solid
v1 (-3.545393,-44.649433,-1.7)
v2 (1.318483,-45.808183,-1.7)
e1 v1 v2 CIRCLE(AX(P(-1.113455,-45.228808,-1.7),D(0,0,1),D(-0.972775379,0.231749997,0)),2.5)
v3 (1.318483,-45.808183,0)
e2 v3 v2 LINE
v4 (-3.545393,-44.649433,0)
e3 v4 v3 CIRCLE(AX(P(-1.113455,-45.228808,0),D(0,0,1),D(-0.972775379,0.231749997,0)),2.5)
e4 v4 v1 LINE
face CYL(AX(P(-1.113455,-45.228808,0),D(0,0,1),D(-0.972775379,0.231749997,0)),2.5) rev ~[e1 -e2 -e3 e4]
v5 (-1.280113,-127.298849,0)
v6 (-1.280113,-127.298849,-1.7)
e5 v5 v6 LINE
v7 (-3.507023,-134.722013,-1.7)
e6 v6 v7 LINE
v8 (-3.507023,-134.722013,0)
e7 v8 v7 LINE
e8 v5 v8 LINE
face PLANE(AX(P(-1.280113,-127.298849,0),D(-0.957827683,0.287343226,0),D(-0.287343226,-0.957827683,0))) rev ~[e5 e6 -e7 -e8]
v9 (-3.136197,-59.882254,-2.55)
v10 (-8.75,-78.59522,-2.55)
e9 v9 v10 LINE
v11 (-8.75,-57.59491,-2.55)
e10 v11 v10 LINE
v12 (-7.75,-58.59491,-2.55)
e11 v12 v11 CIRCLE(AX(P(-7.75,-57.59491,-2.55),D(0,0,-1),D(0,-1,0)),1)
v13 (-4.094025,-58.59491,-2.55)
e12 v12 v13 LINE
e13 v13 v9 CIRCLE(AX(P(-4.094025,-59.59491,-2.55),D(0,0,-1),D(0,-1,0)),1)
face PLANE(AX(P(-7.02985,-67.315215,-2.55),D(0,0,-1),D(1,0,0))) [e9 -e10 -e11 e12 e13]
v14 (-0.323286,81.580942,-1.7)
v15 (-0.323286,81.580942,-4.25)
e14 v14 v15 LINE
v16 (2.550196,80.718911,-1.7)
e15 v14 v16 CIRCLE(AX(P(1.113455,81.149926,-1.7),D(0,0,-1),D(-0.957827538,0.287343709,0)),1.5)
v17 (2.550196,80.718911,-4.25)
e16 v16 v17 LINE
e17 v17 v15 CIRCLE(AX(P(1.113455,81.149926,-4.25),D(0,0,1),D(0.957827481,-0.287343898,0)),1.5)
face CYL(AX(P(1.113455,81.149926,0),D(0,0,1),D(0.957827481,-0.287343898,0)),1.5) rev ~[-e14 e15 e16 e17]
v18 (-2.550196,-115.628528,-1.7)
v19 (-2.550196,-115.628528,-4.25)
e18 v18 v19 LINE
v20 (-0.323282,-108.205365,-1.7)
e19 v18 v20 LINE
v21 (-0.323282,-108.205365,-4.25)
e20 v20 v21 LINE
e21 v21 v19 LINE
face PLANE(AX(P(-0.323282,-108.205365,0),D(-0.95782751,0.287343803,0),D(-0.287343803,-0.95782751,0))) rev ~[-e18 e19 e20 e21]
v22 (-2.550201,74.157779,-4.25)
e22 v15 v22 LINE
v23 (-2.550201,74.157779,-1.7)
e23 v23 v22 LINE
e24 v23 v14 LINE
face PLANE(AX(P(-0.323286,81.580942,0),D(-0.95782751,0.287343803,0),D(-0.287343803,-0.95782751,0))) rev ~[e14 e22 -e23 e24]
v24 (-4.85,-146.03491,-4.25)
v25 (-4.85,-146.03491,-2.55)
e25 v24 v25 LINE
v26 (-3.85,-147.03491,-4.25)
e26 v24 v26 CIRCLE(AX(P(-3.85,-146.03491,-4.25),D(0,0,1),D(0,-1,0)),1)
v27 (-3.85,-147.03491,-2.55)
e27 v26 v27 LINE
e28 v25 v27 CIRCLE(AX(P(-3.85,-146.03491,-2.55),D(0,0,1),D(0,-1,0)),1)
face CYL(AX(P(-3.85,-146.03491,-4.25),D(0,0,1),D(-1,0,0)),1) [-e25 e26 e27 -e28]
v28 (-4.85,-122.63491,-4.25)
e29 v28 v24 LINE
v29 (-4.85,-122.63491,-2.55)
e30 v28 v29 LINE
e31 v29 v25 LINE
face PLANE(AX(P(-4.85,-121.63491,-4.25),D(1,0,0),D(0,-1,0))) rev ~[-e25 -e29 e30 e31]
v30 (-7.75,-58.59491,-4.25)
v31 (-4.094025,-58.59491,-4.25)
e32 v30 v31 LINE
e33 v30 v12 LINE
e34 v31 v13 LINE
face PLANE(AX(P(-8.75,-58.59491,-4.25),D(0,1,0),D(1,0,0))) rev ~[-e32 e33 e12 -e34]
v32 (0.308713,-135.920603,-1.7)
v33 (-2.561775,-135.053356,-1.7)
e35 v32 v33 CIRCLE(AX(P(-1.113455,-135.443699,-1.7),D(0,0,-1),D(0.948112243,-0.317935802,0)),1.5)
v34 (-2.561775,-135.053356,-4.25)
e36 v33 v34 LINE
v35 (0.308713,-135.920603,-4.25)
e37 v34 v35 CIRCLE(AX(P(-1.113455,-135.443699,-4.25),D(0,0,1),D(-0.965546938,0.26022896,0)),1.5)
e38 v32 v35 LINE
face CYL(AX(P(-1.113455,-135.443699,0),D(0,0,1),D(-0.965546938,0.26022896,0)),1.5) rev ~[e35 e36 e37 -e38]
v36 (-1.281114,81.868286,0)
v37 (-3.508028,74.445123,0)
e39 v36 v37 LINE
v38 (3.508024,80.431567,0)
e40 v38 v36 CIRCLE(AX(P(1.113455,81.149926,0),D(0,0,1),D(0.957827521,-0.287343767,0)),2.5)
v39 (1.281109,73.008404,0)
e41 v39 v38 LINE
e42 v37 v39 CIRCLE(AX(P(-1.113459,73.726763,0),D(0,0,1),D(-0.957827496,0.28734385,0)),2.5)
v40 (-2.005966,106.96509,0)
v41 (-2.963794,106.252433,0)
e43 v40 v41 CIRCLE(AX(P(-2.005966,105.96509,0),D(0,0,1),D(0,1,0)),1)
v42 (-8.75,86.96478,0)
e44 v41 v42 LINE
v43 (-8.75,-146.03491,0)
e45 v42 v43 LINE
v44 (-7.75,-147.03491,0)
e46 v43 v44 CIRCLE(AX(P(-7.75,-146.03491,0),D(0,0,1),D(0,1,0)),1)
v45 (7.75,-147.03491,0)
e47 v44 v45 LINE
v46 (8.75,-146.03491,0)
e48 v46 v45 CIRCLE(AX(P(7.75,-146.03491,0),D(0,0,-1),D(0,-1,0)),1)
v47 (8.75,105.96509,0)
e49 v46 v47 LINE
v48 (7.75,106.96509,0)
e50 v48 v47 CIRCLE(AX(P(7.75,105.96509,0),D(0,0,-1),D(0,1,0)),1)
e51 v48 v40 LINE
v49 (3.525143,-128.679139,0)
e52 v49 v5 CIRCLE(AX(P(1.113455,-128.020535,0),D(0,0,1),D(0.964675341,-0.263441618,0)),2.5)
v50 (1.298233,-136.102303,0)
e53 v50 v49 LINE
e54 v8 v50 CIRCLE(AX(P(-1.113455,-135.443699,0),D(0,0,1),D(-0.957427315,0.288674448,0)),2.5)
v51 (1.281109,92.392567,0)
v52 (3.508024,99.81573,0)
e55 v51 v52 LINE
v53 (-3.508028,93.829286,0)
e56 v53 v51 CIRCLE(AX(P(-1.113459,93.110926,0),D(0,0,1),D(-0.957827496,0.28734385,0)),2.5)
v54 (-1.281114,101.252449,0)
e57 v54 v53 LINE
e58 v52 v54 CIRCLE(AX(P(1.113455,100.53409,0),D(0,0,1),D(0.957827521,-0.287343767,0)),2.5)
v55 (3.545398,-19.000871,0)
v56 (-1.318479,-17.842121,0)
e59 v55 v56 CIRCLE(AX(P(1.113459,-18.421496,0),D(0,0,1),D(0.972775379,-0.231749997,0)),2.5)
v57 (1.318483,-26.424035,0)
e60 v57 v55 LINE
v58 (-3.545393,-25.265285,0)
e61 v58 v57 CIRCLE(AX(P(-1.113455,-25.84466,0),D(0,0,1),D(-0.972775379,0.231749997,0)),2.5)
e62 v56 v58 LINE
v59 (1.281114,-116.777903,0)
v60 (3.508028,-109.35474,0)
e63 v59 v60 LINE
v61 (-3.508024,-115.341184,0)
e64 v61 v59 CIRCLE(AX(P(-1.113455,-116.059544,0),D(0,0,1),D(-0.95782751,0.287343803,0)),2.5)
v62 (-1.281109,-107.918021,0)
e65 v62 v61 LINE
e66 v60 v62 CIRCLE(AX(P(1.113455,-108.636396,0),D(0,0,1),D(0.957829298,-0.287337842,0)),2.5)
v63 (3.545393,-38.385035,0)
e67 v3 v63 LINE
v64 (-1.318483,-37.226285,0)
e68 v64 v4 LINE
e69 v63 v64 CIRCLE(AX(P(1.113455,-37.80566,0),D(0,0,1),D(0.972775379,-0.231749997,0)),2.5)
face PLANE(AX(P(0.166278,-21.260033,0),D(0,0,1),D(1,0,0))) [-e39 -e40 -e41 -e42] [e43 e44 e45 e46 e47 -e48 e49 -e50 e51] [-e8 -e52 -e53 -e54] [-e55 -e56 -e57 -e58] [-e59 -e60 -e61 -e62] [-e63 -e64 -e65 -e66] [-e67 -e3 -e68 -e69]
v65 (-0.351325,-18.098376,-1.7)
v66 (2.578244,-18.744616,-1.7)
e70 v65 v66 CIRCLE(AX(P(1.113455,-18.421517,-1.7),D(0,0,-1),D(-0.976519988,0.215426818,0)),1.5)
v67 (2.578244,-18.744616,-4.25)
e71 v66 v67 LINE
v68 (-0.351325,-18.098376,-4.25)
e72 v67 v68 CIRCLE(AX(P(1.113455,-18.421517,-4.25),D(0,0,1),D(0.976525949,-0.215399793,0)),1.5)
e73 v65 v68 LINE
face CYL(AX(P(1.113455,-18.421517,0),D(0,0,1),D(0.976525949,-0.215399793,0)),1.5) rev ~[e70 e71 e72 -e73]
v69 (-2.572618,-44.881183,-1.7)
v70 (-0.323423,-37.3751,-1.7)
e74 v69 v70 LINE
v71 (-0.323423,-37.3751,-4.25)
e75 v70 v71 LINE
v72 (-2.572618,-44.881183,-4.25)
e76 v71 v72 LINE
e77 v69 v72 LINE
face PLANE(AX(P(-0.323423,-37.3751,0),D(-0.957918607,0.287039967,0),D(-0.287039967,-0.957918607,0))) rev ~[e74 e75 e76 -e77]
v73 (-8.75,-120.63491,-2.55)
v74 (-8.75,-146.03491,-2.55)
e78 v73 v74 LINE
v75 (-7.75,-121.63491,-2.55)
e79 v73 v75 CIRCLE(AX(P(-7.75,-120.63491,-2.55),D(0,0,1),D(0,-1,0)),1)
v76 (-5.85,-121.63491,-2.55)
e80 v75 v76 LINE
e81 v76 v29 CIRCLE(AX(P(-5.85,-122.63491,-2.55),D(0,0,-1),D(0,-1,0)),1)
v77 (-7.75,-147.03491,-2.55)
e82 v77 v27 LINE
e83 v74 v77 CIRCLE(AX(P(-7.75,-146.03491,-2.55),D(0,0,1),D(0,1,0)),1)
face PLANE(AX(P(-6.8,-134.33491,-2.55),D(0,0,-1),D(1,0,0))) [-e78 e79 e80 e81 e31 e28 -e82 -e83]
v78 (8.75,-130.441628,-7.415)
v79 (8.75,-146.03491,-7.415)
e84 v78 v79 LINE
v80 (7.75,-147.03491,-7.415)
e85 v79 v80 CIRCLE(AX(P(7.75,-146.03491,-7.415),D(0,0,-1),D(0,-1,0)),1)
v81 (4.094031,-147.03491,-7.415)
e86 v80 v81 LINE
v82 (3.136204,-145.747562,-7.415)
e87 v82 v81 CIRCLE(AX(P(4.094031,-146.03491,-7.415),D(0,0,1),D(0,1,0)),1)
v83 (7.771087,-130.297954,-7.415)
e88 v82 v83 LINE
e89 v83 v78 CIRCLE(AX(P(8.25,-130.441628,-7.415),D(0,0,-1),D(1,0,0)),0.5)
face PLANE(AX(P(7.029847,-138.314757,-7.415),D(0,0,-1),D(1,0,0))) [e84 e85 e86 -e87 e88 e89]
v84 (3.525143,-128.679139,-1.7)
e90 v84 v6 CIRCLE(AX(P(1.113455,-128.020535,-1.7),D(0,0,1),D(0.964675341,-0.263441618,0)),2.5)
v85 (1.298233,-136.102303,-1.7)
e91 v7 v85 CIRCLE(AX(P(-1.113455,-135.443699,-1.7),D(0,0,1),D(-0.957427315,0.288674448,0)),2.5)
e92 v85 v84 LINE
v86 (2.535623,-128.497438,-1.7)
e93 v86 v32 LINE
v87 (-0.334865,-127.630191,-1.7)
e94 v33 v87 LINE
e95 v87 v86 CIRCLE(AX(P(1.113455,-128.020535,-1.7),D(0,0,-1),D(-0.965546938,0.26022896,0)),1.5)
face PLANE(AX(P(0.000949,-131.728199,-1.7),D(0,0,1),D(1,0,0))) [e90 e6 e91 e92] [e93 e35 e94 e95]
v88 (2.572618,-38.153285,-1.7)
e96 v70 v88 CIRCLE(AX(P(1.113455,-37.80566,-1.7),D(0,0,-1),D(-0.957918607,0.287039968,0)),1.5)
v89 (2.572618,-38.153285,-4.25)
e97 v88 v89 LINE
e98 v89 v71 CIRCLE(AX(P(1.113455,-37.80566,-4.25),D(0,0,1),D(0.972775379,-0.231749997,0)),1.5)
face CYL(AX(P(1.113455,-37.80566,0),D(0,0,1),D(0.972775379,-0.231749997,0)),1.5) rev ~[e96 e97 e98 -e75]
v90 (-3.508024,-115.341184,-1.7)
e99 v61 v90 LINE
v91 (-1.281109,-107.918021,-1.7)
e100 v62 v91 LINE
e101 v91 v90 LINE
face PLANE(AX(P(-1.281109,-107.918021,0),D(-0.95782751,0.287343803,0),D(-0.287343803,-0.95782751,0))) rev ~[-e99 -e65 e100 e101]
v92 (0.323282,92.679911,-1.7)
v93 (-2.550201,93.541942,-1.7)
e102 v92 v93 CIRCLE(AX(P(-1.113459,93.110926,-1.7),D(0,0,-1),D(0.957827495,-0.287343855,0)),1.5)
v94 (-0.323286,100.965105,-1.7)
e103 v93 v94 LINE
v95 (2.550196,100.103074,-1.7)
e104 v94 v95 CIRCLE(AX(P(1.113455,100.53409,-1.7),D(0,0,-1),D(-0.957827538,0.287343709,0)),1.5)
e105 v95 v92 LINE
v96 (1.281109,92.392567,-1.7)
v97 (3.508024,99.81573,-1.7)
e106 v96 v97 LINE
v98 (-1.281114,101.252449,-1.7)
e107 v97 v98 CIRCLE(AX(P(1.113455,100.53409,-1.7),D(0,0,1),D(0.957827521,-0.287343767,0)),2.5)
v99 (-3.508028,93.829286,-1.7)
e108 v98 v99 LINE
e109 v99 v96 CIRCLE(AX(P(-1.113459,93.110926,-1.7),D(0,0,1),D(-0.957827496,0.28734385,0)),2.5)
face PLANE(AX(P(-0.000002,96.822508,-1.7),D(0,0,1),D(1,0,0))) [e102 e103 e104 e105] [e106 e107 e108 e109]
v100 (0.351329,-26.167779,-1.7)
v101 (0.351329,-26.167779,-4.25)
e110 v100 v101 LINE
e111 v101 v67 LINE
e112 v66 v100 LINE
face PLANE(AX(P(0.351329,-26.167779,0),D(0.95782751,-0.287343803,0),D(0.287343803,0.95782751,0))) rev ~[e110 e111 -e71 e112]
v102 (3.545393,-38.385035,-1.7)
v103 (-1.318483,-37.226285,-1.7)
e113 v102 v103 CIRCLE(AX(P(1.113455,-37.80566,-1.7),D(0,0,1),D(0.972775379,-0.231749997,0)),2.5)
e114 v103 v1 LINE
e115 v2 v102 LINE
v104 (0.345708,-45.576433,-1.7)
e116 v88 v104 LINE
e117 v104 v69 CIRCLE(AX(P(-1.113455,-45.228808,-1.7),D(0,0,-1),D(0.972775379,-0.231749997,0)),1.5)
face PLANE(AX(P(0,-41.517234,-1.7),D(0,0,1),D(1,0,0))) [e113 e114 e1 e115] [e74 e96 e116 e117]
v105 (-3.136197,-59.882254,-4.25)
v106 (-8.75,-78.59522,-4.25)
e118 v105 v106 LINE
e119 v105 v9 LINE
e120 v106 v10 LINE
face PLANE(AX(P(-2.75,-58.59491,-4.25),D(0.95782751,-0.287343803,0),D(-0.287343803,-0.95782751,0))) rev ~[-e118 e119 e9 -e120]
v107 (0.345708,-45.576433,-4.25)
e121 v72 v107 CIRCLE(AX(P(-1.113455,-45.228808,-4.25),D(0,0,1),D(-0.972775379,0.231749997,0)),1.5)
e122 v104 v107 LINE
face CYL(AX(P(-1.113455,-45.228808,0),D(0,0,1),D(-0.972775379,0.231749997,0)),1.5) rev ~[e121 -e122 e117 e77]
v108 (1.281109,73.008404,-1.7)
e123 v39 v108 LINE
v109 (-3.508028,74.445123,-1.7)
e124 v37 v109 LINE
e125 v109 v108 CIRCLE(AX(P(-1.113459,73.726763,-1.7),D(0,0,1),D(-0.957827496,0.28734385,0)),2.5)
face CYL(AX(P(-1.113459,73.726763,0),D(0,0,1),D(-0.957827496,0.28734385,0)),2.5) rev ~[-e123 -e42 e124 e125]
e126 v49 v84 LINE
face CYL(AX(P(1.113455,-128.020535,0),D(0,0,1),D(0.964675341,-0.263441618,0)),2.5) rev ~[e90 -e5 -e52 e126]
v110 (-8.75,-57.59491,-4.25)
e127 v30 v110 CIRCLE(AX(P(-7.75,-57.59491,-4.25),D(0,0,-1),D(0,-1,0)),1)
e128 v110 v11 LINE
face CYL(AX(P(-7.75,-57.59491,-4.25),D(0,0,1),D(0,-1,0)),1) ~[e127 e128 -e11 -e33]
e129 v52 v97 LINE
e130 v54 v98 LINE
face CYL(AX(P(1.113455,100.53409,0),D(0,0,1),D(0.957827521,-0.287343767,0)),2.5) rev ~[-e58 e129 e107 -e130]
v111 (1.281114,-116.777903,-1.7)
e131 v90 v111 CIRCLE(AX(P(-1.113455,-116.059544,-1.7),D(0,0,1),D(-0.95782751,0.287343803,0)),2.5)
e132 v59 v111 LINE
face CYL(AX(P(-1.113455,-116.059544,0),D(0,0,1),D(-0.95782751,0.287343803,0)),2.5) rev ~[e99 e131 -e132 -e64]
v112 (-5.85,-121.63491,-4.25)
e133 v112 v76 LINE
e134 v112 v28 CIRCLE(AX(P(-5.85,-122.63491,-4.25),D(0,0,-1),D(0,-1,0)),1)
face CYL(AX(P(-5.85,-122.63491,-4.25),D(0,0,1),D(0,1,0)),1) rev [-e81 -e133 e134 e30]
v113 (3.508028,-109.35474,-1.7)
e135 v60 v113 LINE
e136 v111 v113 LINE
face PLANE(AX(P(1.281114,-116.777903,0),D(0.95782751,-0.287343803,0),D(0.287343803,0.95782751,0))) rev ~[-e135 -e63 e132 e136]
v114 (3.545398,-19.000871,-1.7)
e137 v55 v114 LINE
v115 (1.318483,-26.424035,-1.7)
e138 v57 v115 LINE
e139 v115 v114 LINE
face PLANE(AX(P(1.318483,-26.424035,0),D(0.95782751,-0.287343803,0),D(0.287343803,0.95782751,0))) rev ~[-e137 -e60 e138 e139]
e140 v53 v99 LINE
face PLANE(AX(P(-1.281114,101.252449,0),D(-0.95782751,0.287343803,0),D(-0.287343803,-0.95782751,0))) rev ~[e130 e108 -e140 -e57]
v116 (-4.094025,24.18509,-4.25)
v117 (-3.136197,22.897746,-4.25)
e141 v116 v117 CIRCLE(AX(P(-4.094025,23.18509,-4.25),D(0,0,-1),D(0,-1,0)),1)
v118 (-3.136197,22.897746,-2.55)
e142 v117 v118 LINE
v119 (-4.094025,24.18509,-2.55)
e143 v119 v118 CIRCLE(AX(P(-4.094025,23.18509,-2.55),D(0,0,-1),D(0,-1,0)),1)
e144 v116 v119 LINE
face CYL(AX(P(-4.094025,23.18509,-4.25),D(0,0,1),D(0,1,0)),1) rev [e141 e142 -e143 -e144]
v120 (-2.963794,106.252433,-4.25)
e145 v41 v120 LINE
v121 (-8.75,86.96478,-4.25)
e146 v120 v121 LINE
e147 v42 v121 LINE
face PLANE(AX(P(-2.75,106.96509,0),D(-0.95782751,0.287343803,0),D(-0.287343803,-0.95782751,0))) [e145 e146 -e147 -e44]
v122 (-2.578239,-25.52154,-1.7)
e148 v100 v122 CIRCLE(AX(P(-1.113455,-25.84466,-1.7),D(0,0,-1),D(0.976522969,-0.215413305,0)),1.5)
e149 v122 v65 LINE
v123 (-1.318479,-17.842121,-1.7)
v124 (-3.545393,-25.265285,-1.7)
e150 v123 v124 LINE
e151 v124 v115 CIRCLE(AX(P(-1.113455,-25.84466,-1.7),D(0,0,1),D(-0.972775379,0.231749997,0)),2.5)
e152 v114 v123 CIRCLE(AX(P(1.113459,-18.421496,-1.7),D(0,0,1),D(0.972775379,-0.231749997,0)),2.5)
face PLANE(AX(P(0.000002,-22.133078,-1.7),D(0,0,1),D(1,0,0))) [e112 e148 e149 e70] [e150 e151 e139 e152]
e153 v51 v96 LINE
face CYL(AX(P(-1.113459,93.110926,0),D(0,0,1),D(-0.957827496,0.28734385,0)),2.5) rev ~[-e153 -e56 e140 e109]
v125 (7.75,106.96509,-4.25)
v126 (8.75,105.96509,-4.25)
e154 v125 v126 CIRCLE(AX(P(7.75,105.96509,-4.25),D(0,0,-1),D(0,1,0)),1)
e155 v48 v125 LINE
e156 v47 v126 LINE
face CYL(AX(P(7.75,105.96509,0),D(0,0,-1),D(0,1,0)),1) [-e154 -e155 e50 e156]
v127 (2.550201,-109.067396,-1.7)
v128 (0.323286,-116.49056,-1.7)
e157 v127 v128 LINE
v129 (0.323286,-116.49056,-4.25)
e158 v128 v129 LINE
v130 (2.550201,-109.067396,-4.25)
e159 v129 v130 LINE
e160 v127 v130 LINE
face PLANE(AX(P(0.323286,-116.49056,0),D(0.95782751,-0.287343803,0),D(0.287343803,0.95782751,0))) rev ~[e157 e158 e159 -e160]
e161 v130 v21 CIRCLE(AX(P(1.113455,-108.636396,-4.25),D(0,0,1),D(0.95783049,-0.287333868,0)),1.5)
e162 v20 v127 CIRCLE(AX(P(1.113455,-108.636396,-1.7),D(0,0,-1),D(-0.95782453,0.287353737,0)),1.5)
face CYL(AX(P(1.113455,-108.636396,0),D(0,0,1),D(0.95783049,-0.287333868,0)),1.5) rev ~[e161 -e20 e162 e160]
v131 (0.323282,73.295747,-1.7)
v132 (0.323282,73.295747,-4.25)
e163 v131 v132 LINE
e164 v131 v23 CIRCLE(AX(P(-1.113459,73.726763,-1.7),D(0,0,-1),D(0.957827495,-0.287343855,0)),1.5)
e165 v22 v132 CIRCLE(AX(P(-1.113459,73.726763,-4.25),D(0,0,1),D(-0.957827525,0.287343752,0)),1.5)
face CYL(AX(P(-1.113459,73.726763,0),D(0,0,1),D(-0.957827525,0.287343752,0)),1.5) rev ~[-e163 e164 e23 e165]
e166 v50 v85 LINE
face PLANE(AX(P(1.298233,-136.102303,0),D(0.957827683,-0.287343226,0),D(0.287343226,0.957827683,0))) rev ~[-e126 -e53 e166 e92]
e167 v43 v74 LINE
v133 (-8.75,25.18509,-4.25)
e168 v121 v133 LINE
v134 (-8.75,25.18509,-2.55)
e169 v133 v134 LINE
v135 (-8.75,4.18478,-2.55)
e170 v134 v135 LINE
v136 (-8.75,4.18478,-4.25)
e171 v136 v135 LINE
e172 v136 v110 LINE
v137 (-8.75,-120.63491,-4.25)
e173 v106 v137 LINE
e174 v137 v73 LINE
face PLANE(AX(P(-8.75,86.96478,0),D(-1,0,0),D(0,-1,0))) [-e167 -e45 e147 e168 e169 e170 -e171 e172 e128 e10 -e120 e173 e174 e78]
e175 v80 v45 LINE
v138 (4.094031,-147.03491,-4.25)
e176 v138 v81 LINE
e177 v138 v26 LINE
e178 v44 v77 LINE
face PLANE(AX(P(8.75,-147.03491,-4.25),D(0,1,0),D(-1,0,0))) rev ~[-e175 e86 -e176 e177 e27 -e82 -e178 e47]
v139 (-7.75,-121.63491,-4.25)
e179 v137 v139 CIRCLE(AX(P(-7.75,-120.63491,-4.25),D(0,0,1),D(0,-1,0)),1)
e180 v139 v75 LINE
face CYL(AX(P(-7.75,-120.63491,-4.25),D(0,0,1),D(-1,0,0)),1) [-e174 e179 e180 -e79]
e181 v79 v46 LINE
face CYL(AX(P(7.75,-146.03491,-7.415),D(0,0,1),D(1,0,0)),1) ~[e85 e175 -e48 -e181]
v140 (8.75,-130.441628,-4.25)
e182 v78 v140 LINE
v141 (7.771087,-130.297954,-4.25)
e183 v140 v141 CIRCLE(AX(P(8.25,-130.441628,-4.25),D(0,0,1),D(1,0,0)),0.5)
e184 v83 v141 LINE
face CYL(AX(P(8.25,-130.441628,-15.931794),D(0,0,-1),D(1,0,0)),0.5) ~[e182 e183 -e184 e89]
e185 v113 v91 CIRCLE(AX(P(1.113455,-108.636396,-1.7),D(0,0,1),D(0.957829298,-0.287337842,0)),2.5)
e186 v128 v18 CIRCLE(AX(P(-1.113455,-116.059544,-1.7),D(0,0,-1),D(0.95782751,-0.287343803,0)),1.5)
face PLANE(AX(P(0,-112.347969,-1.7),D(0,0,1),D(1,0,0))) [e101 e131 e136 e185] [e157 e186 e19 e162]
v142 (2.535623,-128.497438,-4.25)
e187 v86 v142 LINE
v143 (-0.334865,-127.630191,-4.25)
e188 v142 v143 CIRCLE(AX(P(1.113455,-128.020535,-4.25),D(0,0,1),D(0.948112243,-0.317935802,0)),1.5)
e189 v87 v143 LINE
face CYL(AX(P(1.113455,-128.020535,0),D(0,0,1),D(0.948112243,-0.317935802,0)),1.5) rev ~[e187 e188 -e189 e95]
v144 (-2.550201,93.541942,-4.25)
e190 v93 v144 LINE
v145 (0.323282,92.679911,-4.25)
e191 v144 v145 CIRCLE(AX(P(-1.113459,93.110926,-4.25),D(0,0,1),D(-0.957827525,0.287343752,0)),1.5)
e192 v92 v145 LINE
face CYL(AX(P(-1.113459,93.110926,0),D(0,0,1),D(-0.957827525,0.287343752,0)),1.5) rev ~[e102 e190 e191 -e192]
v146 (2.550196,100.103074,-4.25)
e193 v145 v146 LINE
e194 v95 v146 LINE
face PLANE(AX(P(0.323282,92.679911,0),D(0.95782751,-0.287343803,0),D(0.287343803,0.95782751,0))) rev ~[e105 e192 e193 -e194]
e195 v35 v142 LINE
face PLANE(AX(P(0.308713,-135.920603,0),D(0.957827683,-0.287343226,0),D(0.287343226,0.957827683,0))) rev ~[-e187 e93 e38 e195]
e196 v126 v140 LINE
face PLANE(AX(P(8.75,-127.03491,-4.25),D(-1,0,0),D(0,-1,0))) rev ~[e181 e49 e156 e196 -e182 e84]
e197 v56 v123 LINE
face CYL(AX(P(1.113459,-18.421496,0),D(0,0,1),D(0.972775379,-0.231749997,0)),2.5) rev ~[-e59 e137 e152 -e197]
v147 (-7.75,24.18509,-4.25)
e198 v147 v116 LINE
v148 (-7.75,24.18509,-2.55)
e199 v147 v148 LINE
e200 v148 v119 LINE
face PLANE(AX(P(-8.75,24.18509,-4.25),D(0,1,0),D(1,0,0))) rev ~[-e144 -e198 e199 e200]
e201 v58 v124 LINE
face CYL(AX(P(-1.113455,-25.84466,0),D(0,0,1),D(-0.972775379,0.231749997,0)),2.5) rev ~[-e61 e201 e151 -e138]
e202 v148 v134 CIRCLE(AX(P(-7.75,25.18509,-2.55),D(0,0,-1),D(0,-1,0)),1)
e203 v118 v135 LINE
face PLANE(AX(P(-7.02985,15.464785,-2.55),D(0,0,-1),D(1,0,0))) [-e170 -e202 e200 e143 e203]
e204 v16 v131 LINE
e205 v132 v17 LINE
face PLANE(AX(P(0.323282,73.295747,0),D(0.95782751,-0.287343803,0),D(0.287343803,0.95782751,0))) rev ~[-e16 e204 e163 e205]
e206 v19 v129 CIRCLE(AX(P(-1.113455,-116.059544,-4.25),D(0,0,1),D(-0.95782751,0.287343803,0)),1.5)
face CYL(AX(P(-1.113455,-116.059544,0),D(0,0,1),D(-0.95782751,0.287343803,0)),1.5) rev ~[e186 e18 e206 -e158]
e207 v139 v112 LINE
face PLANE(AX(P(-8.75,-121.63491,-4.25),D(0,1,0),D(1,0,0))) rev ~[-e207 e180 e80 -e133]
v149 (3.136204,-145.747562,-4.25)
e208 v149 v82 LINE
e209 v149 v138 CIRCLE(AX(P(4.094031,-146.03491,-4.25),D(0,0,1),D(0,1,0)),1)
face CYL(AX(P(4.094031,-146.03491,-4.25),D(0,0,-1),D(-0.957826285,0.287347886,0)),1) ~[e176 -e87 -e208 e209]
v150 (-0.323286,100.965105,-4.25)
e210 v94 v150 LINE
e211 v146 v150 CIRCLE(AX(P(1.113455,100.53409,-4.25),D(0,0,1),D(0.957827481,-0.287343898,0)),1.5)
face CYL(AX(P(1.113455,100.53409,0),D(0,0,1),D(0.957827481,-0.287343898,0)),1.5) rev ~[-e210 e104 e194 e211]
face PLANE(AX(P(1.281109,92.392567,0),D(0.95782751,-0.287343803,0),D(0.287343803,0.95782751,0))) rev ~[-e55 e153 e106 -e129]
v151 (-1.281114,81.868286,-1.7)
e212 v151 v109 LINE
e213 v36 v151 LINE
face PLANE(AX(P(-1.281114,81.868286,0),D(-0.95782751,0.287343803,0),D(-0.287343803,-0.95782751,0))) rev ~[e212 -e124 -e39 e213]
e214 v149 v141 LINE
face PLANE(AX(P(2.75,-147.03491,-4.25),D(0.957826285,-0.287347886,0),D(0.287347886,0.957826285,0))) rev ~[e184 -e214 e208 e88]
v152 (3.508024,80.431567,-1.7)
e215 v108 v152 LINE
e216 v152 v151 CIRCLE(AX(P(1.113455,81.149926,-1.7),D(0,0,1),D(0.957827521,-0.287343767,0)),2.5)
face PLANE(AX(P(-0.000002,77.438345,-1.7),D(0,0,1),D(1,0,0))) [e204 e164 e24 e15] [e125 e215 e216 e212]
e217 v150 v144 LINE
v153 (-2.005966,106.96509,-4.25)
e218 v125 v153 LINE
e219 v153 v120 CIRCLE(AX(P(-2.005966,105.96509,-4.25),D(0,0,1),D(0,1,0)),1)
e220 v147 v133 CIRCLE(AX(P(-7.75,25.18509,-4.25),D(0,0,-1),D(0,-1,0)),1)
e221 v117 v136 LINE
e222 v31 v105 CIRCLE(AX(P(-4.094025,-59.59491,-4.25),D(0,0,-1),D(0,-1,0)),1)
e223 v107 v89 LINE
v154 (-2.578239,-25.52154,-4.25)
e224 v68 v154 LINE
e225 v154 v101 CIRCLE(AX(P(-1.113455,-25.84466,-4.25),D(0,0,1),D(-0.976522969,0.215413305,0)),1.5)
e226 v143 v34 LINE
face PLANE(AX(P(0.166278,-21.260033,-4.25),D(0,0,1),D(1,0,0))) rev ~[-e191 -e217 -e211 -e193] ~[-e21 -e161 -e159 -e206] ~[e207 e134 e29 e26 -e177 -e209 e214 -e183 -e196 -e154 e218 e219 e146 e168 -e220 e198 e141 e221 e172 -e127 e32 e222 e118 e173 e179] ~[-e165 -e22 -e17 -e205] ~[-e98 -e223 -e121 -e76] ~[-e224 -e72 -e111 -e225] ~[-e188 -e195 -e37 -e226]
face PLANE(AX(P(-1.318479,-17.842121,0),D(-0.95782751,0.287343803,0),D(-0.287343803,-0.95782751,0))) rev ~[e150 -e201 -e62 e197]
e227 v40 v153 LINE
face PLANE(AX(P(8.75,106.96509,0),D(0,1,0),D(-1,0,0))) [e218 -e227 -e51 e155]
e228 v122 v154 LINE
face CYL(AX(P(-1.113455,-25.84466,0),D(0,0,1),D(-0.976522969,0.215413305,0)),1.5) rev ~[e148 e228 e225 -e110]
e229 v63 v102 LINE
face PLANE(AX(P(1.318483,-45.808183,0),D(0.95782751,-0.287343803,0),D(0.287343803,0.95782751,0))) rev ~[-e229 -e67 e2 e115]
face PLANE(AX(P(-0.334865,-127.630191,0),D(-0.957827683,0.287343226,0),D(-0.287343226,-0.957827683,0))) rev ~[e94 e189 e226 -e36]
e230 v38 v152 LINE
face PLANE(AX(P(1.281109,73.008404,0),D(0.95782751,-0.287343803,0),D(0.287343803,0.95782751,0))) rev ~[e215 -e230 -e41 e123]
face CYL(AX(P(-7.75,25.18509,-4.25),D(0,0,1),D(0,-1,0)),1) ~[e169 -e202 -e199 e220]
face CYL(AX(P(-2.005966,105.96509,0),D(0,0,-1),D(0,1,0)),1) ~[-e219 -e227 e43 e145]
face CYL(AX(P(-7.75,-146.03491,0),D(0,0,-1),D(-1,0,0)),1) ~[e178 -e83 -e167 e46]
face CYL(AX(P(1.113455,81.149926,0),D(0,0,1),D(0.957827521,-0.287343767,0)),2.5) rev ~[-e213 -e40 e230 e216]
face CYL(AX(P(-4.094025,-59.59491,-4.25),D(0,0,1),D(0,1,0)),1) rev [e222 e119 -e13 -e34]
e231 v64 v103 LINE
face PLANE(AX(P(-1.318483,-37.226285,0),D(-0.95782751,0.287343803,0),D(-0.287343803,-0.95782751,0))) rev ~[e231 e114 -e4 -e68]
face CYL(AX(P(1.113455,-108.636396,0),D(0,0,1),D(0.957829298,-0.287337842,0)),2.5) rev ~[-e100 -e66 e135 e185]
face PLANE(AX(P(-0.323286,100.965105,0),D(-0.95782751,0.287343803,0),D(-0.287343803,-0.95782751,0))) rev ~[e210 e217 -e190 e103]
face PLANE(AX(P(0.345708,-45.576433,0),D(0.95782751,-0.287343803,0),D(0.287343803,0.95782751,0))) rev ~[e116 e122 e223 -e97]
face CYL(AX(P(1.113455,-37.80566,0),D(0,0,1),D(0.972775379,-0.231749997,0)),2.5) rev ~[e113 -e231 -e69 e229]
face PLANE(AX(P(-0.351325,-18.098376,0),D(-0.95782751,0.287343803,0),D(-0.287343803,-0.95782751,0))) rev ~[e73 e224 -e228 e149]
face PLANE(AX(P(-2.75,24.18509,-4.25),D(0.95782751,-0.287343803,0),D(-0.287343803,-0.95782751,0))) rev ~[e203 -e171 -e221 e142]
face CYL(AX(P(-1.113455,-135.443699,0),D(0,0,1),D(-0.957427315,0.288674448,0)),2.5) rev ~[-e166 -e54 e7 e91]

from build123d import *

# Parameters (mm, degrees)
F1_DEPTH    = 4.25
F2_W        = 3.9
F2_H        = 25.4
F3_DEPTH    = 1.7
F4_DEPTH    = 3.165
F5_R        = 1
F6_T1_DEPTH = 11.6817943787
F8_DEPTH    = 1.7
F9_DEPTH    = 25


# Not quite as in the source:
# - a fillet or chamfer that OpenCascade refuses, or shapes differently, is made with other operations: its cross-section is extruded or revolved along the edge and cut away or added
# - a feature names something its author has since deleted; it is built from what else it names


with BuildPart() as f1:
    # F0 (on Top) → F1 (new body)
    with BuildSketch(Plane.XY):
        Polygon((8.75, 106.9650896668), (-2.75, 106.9650896668), (-8.75, 86.9647799072), (-8.75, -147.0349103332), (8.75, -147.0349103332), align=None)
    extrude(amount=-F1_DEPTH)

    # F2 (on face) → F3 (cut)
    with BuildSketch(Plane(origin=(0, 0, -4.25), x_dir=(1, 0, 0), z_dir=(0, 0, -1))):
        with Locations((-6.8, 134.3349103332)):
            Rectangle(F2_W, F2_H)
        Polygon((-8.75, 78.5952200928), (-8.75, 58.5949103332), (-2.75, 58.5949103332), align=None)
        Polygon((-8.75, -4.1847799072), (-8.75, -24.1850896668), (-2.75, -24.1850896668), align=None)
    extrude(amount=-F3_DEPTH, mode=Mode.SUBTRACT)

    # F2 (on face) → F4 (join)
    with BuildSketch(Plane(origin=(0, 0, -4.25), x_dir=(1, 0, 0), z_dir=(0, 0, -1))):
        Polygon((2.75, 147.0349103332), (8.75, 127.0349103332), (8.75, 147.0349103332), align=None)
    extrude(amount=F4_DEPTH)

    # F5
    f5_edges = [f1.edges().sort_by_distance(p)[0] for p in [
        (-2.75, -58.59491, -3.4),
        (-8.75, -58.59491, -3.4),
        (-4.85, -121.63491, -3.4),
        (-8.75, -121.63491, -3.4),
        (-4.85, -147.03491, -3.4),
        (-8.75, -147.03491, -1.275),
        (8.75, -147.03491, -3.7075),
        (2.75, -147.03491, -5.8325),
        (-2.75, 24.18509, -3.4),
        (-8.75, 24.18509, -3.4),
        (8.75, 106.96509, -2.125),
        (-2.75, 106.96509, -2.125),
    ]]
    fillet(f5_edges, radius=F5_R)

    # F6: fillet of radius 0.5 on 1 edges, made by hand

    # F6_s2 → F6_t1 (cut)
    with BuildSketch(Plane.XY.offset(-15.9317943787)):
        with BuildLine():
            ThreePointArc((8.75, -130.4416280846), (8.3226065723, -129.9469278869), (7.7710868574, -130.2979541419))
            Line((7.7710868574, -130.2979541419), (8.75, -127.0349103332))
            Line((8.75, -127.0349103332), (8.75, -130.4416280846))
        make_face()
    extrude(amount=F6_T1_DEPTH, mode=Mode.SUBTRACT)

    # F7 (on face) → F8 (cut)
    with BuildSketch(Plane.XY):
        with BuildLine():
            Line((-1.281113759, 101.2524492275), (-3.5080282296, 93.8292860243))
            ThreePointArc((-3.5080282296, 93.8292860243), (-1.8318189791, 90.7163576177), (1.2811093315, 92.3925670464))
            Line((1.2811093315, 92.3925670464), (3.508023802, 99.8157302495))
            ThreePointArc((3.508023802, 99.8157302495), (1.831814489, 102.9286584474), (-1.281113759, 101.2524492275))
        make_face()
        with BuildLine():
            Line((2.5501962221, 100.1030738196), (0.3232817516, 92.6799106164))
            ThreePointArc((0.3232817516, 92.6799106164), (-1.5444751953, 91.6741851335), (-2.5502007779, 93.5419420268))
            Line((-2.5502007779, 93.5419420268), (-0.3232863074, 100.9651052299))
            ThreePointArc((-0.3232863074, 100.9651052299), (1.5444707052, 101.9708309316), (2.5501962221, 100.1030738196))
        make_face(mode=Mode.SUBTRACT)
        with BuildLine():
            Line((-1.281113759, 81.8682859589), (-3.5080282296, 74.4451227557))
            ThreePointArc((-3.5080282296, 74.4451227557), (-1.8318189791, 71.3321943492), (1.2811093315, 73.0084037778))
            Line((1.2811093315, 73.0084037778), (3.508023802, 80.431566981))
            ThreePointArc((3.508023802, 80.431566981), (1.831814489, 83.5444951788), (-1.281113759, 81.8682859589))
        make_face()
        with BuildLine():
            Line((2.5501962221, 80.718910551), (0.3232817516, 73.2957473478))
            ThreePointArc((0.3232817516, 73.2957473478), (-1.5444751953, 72.2900218649), (-2.5502007779, 74.1577787582))
            Line((-2.5502007779, 74.1577787582), (-0.3232863074, 81.5809419614))
            ThreePointArc((-0.3232863074, 81.5809419614), (1.5444707052, 82.586667663), (2.5501962221, 80.718910551))
        make_face(mode=Mode.SUBTRACT)
        with BuildLine():
            Line((-1.3184834487, -37.2262845319), (-3.5453934487, -44.6494328331))
            ThreePointArc((-3.5453934487, -44.6494328331), (-1.6928299922, -47.6607462741), (1.3184834487, -45.8081828176))
            Line((1.3184834487, -45.8081828176), (3.5453934487, -38.3850345164))
            ThreePointArc((3.5453934487, -38.3850345164), (1.6928299922, -35.3737210755), (-1.3184834487, -37.2262845319))
        make_face()
        with BuildLine():
            ThreePointArc((-0.32342291, -37.3750995728), (1.5027069877, -36.3570453968), (2.5726180692, -38.1532845195))
            Line((2.5726180692, -38.1532845195), (0.3457080692, -45.5764328207))
            ThreePointArc((0.3457080692, -45.5764328207), (-1.4610799953, -46.6879708946), (-2.5726180692, -44.88118283))
            Line((-2.5726180692, -44.88118283), (-0.32342291, -37.3750995728))
        make_face(mode=Mode.SUBTRACT)
        with BuildLine():
            ThreePointArc((-3.5453934487, -25.2652845319), (-1.6928299922, -28.2765979729), (1.3184834487, -26.4240345164))
            Line((1.3184834487, -26.4240345164), (3.5453979193, -19.0008713133))
            ThreePointArc((3.5453979193, -19.0008713133), (1.6928344628, -15.9895578723), (-1.3184789782, -17.8421213288))
            Line((-1.3184789782, -17.8421213288), (-3.5453934487, -25.2652845319))
        make_face()
        with BuildLine():
            ThreePointArc((0.3513294529, -26.167779481), (-1.4365749568, -27.3094439771), (-2.5782394529, -25.5215395674))
            Line((-2.5782394529, -25.5215395674), (-0.3513249813, -18.0983763605))
            ThreePointArc((-0.3513249813, -18.0983763605), (1.4365749587, -16.9567321352), (2.5782439235, -18.7446162778))
            Line((2.5782439235, -18.7446162778), (0.3513294529, -26.167779481))
        make_face(mode=Mode.SUBTRACT)
        with BuildLine():
            Line((-1.2811093046, -107.9180212426), (-3.5080237752, -115.3411844458))
            ThreePointArc((-3.5080237752, -115.3411844458), (-1.8318145066, -118.4541127276), (1.2811137752, -116.7779034591))
            Line((1.2811137752, -116.7779034591), (3.5080282457, -109.3547402559))
            ThreePointArc((3.5080282457, -109.3547402559), (1.8318145067, -106.2418268761), (-1.2811093046, -107.9180212426))
        make_face()
        with BuildLine():
            ThreePointArc((-0.3232817945, -108.2053650453), (1.544470704, -107.1996543861), (2.5502007356, -109.0673964532))
            Line((2.5502007356, -109.0673964532), (0.3232862651, -116.4905596564))
            ThreePointArc((0.3232862651, -116.4905596564), (-1.544470704, -117.4962852176), (-2.5501962651, -115.6285282484))
            Line((-2.5501962651, -115.6285282484), (-0.3232817945, -108.2053650453))
        make_face(mode=Mode.SUBTRACT)
        with BuildLine():
            Line((-1.280113287, -127.2988486416), (-3.507023287, -134.7220131859))
            ThreePointArc((-3.507023287, -134.7220131859), (-1.8036595485, -137.8465346478), (1.2982333531, -136.1023033504))
            Line((1.2982333531, -136.1023033504), (3.5251433531, -128.6791388061))
            ThreePointArc((3.5251433531, -128.6791388061), (1.8036595485, -125.6176994193), (-1.280113287, -127.2988486416))
        make_face()
        with BuildLine():
            ThreePointArc((0.308713365, -135.9206030083), (-1.5472756815, -136.8795961043), (-2.5617754063, -135.0533558662))
            Line((-2.5617754063, -135.0533558662), (-0.3348654063, -127.6301913219))
            ThreePointArc((-0.3348654063, -127.6301913219), (1.5472756815, -126.5846379628), (2.535623365, -128.4974384639))
            Line((2.535623365, -128.4974384639), (0.308713365, -135.9206030083))
        make_face(mode=Mode.SUBTRACT)
    extrude(amount=-F8_DEPTH, mode=Mode.SUBTRACT)

    # F7 (on face) → F9 (cut)
    with BuildSketch(Plane.XY):
        with BuildLine():
            Line((-0.3348654063, -127.6301913219), (-2.5617754063, -135.0533558662))
            ThreePointArc((-2.5617754063, -135.0533558662), (-1.5472756815, -136.8795961043), (0.308713365, -135.9206030083))
            Line((0.308713365, -135.9206030083), (2.535623365, -128.4974384639))
            ThreePointArc((2.535623365, -128.4974384639), (1.5472756815, -126.5846379628), (-0.3348654063, -127.6301913219))
        make_face()
        with BuildLine():
            Line((0.3232862651, -116.4905596564), (2.5502007356, -109.0673964532))
            ThreePointArc((2.5502007356, -109.0673964532), (1.544470704, -107.1996543861), (-0.3232817945, -108.2053650453))
            Line((-0.3232817945, -108.2053650453), (-2.5501962651, -115.6285282484))
            ThreePointArc((-2.5501962651, -115.6285282484), (-1.544470704, -117.4962852176), (0.3232862651, -116.4905596564))
        make_face()
        with BuildLine():
            Line((0.3457080692, -45.5764328207), (2.5726180692, -38.1532845195))
            ThreePointArc((2.5726180692, -38.1532845195), (1.5027069877, -36.3570453968), (-0.32342291, -37.3750995728))
            Line((-0.32342291, -37.3750995728), (-2.5726180692, -44.88118283))
            ThreePointArc((-2.5726180692, -44.88118283), (-1.4610799953, -46.6879708946), (0.3457080692, -45.5764328207))
        make_face()
        with BuildLine():
            Line((-0.3513249813, -18.0983763605), (-2.5782394529, -25.5215395674))
            ThreePointArc((-2.5782394529, -25.5215395674), (-1.4365749568, -27.3094439771), (0.3513294529, -26.167779481))
            Line((0.3513294529, -26.167779481), (2.5782439235, -18.7446162778))
            ThreePointArc((2.5782439235, -18.7446162778), (1.4365749587, -16.9567321352), (-0.3513249813, -18.0983763605))
        make_face()
        with BuildLine():
            ThreePointArc((-2.5502007779, 93.5419420268), (-1.5444751953, 91.6741851335), (0.3232817516, 92.6799106164))
            Line((0.3232817516, 92.6799106164), (2.5501962221, 100.1030738196))
            ThreePointArc((2.5501962221, 100.1030738196), (1.5444707052, 101.9708309316), (-0.3232863074, 100.9651052299))
            Line((-0.3232863074, 100.9651052299), (-2.5502007779, 93.5419420268))
        make_face()
        with BuildLine():
            ThreePointArc((-2.5502007779, 74.1577787582), (-1.5444751953, 72.2900218649), (0.3232817516, 73.2957473478))
            Line((0.3232817516, 73.2957473478), (2.5501962221, 80.718910551))
            ThreePointArc((2.5501962221, 80.718910551), (1.5444707052, 82.586667663), (-0.3232863074, 81.5809419614))
            Line((-0.3232863074, 81.5809419614), (-2.5502007779, 74.1577787582))
        make_face()
    extrude(amount=-F9_DEPTH, mode=Mode.SUBTRACT)


solid = f1.part
